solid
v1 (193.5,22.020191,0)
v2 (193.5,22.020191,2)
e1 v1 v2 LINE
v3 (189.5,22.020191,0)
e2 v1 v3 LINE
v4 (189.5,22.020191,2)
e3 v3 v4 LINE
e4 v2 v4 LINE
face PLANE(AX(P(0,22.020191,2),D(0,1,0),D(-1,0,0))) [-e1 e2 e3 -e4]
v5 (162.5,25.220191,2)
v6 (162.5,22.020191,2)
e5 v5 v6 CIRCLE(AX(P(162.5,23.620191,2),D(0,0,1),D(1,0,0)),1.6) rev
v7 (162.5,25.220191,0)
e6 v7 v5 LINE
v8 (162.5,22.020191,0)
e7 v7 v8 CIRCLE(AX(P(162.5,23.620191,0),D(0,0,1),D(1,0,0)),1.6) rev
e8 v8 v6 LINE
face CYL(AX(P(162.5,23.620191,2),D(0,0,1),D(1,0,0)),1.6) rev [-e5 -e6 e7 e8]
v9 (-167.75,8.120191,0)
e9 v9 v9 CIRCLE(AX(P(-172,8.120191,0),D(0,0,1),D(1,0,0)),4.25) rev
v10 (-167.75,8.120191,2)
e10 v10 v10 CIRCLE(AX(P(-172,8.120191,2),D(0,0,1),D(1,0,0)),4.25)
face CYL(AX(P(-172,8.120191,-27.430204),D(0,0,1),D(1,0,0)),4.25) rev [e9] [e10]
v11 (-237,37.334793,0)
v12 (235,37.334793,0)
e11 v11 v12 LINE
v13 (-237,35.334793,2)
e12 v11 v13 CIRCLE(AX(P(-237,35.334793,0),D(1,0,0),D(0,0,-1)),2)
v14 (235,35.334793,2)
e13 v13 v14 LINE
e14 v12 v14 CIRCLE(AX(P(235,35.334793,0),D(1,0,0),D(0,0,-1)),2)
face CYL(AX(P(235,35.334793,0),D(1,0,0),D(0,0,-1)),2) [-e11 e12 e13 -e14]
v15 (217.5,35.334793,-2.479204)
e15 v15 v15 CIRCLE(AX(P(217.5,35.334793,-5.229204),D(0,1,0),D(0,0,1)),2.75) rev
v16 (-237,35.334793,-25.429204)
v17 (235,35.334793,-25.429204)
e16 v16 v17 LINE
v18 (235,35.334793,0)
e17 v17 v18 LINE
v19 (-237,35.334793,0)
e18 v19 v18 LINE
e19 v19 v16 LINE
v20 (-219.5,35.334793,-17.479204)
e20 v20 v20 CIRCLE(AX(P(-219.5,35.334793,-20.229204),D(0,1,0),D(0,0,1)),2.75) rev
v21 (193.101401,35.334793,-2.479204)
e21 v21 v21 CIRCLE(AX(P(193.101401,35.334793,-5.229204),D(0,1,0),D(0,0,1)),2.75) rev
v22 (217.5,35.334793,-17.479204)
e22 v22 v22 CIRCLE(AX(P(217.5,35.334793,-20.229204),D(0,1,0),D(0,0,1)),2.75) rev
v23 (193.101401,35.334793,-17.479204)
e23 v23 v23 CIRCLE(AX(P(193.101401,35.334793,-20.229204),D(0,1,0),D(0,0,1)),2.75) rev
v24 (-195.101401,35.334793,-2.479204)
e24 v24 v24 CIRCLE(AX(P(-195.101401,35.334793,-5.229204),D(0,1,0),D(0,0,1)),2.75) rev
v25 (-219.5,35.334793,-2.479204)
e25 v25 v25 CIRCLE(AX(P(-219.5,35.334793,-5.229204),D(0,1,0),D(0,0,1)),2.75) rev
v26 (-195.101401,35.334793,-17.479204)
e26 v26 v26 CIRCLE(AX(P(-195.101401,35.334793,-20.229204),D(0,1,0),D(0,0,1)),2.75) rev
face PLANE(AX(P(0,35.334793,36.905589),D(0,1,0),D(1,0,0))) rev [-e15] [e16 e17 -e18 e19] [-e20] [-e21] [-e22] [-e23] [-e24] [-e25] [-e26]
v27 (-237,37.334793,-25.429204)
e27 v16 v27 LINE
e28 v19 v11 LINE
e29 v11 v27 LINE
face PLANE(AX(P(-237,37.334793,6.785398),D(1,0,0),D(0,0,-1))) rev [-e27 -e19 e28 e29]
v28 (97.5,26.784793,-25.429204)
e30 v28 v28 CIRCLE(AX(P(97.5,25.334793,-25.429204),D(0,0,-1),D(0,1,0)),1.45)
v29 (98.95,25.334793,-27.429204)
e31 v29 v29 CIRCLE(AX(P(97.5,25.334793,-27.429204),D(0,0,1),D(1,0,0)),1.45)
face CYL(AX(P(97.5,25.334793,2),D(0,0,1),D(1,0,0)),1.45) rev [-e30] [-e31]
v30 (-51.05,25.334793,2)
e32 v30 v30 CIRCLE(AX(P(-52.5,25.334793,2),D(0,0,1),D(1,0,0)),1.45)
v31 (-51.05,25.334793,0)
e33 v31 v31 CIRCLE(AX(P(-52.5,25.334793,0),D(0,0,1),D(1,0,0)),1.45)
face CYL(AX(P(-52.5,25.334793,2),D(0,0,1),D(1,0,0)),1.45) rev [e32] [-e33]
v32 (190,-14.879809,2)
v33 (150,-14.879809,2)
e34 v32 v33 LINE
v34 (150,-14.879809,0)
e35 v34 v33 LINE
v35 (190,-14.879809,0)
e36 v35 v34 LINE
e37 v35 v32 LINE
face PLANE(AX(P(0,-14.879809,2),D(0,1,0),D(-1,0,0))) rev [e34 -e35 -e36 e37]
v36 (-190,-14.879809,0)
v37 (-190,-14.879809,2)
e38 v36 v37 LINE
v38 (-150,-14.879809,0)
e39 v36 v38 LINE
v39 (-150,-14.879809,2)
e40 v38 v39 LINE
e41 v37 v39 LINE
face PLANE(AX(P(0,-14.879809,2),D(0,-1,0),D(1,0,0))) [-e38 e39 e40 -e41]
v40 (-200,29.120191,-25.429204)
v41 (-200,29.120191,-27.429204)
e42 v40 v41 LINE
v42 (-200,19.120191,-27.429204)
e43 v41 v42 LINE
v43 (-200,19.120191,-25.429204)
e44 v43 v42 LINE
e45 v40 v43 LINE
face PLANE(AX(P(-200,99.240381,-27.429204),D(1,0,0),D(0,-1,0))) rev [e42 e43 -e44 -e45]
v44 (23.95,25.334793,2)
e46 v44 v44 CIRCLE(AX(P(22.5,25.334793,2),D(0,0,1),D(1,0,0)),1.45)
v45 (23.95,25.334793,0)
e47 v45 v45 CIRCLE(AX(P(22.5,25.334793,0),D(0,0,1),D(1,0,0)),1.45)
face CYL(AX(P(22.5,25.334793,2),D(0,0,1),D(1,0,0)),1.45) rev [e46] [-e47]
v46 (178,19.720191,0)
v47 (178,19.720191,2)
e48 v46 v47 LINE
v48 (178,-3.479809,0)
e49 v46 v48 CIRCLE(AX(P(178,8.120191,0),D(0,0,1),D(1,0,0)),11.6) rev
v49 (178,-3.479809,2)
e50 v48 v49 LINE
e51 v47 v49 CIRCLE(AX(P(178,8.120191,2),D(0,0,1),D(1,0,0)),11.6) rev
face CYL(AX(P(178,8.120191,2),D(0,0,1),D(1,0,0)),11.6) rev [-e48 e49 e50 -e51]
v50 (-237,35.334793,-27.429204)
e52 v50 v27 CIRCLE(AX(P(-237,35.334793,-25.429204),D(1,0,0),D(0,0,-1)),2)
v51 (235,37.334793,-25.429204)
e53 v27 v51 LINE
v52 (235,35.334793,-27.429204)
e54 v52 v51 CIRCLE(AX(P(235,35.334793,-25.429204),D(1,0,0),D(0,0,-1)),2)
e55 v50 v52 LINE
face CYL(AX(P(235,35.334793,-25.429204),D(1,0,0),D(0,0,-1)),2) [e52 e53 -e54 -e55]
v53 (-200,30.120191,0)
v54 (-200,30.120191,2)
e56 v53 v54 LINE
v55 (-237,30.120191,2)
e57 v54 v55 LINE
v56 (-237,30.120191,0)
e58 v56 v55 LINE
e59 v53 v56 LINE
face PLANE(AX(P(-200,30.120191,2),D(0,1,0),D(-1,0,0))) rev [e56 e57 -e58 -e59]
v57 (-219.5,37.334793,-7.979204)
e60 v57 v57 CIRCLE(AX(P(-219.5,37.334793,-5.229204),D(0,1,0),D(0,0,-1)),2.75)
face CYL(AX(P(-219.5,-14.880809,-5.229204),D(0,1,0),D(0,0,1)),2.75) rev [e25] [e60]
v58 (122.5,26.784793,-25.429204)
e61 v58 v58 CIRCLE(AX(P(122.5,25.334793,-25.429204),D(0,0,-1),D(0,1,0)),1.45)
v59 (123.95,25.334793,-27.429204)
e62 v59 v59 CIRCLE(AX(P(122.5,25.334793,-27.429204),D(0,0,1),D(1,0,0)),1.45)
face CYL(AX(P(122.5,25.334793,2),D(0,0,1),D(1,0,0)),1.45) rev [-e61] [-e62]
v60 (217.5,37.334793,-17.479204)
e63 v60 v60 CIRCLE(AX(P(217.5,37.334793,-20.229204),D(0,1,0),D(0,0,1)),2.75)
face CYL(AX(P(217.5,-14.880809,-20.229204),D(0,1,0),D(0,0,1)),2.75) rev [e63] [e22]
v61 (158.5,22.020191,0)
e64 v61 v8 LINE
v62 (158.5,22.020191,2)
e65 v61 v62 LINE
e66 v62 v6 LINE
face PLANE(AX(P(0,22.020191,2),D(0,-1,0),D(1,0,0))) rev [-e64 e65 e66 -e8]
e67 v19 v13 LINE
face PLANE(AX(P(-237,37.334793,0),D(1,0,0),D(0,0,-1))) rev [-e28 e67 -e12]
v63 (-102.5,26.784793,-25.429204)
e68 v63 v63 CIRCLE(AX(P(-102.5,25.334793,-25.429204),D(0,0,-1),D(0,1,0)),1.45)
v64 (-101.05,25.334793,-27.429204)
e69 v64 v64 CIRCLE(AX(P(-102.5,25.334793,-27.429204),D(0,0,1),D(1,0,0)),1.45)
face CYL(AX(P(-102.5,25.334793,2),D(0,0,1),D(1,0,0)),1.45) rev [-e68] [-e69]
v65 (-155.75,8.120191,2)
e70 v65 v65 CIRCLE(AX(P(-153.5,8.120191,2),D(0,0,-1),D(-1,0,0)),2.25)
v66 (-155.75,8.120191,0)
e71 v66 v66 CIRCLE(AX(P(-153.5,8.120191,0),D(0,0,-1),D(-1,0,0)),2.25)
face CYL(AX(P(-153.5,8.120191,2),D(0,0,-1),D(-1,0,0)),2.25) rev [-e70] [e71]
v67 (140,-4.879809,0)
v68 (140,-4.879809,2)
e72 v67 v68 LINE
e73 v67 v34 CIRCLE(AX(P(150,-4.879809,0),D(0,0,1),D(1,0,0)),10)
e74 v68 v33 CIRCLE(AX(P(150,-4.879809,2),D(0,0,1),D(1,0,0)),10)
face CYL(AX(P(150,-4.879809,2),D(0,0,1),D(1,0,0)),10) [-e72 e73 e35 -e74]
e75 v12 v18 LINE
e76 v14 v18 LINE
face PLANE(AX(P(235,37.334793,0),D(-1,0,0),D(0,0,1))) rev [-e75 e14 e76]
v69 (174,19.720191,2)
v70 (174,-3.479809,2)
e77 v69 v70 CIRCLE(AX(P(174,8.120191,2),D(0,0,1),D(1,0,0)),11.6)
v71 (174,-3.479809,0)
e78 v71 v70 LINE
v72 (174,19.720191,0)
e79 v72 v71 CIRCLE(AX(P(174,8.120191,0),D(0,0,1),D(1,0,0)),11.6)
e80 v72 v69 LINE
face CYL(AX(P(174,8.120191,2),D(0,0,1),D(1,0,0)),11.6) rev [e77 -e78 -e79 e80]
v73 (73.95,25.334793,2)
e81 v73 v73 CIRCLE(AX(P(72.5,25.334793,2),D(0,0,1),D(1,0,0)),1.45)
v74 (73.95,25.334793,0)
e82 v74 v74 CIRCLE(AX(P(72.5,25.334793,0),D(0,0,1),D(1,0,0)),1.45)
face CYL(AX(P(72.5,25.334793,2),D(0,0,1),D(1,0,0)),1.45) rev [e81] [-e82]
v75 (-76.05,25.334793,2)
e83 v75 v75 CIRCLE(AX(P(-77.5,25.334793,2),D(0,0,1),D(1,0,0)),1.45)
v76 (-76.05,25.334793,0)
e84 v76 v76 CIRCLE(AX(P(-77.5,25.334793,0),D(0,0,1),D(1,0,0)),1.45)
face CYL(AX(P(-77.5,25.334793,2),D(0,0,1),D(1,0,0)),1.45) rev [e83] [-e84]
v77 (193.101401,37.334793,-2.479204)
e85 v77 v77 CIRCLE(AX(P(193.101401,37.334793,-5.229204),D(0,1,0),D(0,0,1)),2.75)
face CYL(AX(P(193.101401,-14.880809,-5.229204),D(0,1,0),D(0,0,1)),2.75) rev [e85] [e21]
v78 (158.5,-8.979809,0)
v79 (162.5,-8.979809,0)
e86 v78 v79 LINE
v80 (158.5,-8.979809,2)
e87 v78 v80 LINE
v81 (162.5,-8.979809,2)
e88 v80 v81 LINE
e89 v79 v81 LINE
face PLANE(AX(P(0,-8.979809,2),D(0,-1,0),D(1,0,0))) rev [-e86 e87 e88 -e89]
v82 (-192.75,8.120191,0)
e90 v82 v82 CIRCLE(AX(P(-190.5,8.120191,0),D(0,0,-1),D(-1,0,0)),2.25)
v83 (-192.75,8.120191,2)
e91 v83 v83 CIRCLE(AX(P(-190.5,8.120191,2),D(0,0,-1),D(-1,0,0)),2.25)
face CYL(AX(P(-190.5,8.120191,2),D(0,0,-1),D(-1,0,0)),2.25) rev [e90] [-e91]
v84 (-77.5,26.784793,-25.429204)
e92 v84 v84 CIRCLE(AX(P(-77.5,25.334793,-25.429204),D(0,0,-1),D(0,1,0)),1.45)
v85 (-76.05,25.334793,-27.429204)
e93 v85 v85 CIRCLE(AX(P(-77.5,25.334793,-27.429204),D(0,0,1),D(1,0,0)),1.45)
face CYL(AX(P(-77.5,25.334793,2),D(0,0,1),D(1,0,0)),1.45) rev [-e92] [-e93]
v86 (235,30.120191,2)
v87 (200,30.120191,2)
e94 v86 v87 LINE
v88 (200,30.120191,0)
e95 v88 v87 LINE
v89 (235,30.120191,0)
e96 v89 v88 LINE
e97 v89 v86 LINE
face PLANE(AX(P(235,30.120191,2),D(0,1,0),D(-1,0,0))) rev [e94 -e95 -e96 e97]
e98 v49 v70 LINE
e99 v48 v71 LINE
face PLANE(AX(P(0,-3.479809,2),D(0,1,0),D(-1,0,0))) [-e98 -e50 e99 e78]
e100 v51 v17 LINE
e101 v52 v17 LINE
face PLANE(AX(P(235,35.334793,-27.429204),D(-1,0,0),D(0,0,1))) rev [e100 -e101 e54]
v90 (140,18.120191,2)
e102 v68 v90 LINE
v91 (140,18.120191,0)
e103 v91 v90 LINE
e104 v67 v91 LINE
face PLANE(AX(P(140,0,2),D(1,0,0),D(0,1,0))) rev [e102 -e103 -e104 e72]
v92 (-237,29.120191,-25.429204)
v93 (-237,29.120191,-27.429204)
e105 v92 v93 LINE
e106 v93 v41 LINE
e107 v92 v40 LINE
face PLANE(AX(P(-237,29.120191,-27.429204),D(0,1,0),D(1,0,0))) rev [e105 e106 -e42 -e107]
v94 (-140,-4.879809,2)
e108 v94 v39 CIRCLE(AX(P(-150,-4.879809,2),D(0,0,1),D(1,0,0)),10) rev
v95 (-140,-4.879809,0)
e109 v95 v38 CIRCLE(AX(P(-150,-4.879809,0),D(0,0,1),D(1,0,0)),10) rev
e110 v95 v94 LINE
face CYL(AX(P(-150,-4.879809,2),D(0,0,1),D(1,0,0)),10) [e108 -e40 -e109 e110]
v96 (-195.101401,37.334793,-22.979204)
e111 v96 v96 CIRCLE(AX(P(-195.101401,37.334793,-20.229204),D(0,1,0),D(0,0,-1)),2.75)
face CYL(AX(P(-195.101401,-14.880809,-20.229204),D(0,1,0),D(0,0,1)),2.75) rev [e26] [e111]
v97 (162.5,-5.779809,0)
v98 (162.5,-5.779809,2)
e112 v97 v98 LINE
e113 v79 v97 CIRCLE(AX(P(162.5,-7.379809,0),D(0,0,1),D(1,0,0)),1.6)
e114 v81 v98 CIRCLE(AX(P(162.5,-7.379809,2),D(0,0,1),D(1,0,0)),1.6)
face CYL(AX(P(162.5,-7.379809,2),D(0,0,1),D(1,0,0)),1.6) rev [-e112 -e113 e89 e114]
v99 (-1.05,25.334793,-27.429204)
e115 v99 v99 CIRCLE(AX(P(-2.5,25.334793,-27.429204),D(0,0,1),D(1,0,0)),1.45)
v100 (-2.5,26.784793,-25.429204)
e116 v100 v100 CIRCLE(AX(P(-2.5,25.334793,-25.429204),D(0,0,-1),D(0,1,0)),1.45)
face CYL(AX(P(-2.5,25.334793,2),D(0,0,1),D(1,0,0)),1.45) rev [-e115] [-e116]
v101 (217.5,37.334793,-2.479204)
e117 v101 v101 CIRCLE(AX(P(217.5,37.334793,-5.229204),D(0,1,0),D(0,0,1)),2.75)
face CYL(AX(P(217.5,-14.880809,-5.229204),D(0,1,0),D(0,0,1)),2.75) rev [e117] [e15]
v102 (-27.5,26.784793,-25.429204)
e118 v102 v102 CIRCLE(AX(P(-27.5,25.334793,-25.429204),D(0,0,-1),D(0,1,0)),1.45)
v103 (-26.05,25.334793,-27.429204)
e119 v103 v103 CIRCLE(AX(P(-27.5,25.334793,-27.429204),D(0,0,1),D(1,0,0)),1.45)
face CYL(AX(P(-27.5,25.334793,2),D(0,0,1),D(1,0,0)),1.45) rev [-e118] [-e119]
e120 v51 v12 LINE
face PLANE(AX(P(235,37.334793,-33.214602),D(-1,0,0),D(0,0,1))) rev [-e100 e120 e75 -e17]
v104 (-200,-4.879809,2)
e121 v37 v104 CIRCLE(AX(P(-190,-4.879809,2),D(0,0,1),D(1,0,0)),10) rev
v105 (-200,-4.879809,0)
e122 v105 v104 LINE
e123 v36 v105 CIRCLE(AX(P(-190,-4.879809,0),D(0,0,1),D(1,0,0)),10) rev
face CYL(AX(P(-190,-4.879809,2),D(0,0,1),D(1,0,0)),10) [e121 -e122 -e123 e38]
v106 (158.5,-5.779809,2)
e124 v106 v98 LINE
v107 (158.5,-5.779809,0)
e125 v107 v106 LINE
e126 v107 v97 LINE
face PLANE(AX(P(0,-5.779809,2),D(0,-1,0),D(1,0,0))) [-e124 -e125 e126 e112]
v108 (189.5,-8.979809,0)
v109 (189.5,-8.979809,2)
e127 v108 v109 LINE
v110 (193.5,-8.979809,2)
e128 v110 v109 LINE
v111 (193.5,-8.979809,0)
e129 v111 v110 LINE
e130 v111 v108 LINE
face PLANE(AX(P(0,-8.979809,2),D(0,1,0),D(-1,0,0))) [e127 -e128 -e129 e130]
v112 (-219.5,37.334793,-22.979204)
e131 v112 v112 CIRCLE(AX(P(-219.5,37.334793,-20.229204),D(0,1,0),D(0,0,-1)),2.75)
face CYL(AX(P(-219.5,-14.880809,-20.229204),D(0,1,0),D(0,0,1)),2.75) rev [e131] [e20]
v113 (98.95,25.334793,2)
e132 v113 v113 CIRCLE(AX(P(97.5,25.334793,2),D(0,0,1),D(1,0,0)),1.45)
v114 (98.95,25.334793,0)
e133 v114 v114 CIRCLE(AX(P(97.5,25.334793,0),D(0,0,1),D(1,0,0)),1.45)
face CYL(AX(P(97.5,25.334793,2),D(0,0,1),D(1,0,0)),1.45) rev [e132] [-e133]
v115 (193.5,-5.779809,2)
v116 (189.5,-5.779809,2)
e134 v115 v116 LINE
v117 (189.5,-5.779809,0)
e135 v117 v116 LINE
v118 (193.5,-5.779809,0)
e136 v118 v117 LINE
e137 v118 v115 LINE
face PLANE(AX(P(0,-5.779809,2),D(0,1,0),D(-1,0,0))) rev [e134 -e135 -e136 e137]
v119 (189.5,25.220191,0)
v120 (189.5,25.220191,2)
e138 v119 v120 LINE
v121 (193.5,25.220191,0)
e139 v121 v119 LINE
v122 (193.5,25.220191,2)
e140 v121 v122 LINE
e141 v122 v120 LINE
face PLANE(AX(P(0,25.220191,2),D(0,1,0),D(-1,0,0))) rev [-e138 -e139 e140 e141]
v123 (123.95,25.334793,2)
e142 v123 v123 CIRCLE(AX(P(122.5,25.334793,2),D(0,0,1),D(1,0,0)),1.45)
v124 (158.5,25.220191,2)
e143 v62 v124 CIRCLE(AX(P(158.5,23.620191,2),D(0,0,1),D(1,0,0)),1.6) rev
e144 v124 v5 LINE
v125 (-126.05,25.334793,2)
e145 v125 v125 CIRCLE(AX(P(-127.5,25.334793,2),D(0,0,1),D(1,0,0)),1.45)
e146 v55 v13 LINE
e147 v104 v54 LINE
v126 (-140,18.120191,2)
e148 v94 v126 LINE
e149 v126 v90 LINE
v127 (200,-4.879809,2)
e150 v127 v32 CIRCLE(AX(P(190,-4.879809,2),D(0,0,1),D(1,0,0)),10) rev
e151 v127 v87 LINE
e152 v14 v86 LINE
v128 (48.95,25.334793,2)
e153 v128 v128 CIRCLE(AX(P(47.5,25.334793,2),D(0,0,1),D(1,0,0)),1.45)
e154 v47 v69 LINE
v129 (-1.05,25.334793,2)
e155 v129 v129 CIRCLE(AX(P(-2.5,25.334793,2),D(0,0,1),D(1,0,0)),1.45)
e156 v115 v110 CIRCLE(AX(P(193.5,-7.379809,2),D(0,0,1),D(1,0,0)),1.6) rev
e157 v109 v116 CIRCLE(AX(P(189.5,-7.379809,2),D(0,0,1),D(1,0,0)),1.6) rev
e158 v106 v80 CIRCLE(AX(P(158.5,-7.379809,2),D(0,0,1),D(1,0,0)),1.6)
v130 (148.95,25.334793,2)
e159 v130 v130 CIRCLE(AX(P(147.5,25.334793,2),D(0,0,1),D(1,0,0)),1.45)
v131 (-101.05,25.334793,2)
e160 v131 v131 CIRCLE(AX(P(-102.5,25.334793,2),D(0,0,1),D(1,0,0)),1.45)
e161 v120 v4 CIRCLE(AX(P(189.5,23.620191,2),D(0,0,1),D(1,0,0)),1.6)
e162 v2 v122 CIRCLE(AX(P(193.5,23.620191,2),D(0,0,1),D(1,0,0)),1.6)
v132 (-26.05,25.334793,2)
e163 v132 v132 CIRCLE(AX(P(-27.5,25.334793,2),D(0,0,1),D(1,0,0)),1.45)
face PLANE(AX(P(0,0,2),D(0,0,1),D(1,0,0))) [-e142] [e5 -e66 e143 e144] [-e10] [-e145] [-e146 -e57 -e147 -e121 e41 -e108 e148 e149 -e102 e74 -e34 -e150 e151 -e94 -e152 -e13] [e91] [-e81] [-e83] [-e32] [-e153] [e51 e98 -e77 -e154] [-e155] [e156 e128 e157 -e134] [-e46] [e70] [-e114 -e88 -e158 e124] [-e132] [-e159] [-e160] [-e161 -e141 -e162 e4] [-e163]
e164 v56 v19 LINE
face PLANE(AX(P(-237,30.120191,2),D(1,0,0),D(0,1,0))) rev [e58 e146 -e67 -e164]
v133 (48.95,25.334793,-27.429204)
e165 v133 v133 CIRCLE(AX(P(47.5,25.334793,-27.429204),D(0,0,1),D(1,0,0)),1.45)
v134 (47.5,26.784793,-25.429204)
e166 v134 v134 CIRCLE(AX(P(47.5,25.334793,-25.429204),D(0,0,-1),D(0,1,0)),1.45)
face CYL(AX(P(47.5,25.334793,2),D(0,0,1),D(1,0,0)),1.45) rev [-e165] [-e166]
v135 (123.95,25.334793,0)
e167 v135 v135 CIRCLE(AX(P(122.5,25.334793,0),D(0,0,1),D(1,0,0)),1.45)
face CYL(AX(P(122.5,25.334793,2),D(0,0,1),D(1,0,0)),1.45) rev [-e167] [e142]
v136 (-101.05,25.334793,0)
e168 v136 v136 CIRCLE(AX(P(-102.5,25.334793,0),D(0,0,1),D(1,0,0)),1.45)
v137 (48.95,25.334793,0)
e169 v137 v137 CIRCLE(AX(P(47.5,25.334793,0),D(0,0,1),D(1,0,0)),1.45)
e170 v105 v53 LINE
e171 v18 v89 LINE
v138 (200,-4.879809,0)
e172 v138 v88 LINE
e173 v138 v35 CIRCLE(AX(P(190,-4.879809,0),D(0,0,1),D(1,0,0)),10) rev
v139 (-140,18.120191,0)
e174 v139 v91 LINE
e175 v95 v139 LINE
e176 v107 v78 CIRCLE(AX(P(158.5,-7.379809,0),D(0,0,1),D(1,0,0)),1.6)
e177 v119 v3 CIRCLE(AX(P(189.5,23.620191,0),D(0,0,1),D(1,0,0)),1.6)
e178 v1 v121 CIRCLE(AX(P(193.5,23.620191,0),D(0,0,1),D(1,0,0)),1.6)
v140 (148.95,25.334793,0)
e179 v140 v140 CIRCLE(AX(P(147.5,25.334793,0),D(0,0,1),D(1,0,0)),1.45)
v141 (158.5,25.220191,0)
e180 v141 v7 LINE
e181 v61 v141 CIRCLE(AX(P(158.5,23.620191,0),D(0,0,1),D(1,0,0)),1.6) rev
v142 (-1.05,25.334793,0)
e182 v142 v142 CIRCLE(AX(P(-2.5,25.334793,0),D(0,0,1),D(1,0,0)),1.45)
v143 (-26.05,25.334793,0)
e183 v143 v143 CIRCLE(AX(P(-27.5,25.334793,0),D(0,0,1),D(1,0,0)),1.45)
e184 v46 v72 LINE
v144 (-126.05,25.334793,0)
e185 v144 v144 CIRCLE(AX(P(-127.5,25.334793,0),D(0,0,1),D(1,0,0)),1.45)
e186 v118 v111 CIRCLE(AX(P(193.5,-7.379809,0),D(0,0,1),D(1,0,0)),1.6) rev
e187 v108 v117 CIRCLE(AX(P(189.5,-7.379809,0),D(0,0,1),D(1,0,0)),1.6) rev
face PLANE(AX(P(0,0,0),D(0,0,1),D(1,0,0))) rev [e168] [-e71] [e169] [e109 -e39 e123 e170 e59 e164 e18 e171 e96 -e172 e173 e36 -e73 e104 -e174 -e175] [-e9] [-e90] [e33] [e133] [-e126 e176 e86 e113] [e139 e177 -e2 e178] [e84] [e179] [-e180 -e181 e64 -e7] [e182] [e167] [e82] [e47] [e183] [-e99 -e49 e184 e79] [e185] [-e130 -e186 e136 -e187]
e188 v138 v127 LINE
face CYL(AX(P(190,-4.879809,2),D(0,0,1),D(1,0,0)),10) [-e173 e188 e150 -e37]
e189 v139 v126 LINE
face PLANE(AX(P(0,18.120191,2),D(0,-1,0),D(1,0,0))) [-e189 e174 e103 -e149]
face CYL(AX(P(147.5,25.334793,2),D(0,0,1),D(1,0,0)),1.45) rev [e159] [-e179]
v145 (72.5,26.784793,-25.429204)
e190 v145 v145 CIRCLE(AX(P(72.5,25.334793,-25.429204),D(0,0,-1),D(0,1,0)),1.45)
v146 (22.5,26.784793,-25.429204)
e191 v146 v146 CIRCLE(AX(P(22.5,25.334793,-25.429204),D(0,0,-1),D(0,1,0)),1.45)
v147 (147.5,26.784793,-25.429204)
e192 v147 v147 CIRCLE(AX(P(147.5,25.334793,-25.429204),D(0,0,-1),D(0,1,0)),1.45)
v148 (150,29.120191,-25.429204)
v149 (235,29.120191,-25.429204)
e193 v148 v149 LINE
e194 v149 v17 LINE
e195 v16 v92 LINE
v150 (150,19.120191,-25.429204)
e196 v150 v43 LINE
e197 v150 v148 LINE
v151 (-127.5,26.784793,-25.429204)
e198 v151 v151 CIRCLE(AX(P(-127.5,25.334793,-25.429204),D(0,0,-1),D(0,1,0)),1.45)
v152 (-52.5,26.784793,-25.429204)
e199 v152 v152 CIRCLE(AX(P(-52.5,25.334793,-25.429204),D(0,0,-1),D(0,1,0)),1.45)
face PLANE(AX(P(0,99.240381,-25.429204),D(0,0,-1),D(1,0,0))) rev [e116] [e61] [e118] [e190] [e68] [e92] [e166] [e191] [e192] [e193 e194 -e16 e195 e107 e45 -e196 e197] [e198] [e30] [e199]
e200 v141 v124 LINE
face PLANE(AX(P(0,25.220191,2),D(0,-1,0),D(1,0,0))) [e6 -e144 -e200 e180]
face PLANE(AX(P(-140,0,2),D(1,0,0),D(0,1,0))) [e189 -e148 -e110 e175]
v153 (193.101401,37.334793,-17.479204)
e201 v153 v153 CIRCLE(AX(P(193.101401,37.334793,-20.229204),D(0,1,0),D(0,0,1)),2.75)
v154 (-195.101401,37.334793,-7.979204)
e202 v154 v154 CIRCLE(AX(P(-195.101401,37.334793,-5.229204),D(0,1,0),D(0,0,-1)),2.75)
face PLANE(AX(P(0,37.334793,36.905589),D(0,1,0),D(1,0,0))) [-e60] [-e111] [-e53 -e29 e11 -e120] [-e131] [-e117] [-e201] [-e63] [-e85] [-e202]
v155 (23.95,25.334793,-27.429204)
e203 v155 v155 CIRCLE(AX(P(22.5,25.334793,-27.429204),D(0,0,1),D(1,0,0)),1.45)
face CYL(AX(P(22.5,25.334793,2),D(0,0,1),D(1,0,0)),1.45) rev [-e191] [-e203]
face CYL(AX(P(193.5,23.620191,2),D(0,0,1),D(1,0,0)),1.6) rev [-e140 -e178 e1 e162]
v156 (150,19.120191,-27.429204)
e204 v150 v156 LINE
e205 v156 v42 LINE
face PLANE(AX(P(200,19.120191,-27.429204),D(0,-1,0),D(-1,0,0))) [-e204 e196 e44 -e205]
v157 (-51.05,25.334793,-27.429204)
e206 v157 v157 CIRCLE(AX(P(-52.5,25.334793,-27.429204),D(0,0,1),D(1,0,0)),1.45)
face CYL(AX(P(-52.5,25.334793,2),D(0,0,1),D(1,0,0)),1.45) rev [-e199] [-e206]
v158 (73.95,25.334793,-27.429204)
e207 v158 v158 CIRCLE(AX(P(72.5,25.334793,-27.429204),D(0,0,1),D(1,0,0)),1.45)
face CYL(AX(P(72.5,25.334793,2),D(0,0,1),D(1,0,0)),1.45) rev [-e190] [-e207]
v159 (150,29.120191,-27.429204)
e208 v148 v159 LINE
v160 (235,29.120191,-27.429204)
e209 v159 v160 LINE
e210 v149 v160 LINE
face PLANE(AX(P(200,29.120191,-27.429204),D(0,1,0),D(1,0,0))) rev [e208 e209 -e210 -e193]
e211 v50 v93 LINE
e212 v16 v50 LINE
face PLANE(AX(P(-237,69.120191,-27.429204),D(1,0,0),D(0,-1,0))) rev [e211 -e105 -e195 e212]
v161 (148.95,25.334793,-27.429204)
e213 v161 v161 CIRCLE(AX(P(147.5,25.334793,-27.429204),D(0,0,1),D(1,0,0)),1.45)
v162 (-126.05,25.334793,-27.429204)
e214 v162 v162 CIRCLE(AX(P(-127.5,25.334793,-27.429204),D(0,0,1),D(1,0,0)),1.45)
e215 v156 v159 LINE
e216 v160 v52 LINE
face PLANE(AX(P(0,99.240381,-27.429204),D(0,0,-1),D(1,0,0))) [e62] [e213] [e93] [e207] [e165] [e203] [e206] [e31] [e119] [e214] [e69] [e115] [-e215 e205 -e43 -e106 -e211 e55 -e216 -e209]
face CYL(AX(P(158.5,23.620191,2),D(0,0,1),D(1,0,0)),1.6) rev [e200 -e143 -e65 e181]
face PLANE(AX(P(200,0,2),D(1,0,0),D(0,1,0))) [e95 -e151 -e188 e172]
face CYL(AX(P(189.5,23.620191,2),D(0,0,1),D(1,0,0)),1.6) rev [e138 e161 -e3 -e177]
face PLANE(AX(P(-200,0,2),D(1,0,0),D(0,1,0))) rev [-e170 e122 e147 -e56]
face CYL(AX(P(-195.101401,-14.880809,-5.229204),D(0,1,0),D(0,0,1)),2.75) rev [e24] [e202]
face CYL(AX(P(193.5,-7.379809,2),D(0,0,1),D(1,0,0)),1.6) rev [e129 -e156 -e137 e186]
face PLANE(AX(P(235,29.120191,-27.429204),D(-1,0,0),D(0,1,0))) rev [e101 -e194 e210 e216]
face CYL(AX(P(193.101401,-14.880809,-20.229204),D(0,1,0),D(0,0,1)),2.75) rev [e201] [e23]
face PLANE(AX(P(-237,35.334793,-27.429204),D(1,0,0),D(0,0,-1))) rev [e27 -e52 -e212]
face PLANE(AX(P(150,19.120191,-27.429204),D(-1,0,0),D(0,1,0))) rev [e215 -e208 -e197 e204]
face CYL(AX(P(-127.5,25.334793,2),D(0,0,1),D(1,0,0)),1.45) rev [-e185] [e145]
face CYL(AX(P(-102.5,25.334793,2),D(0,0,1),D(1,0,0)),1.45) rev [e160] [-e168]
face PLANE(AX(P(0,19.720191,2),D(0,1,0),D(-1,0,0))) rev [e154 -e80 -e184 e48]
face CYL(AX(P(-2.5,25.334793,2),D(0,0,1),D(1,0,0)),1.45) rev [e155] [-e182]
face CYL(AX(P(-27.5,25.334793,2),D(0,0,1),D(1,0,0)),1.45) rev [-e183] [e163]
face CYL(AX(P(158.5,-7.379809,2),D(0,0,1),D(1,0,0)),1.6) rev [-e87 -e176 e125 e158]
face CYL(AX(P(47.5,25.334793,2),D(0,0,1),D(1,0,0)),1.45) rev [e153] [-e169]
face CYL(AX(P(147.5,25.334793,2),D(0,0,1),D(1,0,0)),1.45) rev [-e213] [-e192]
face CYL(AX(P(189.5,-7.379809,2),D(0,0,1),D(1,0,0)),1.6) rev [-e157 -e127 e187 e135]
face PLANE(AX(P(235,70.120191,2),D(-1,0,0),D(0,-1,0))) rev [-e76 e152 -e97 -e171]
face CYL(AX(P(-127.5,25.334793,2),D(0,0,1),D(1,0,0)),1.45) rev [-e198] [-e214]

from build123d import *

# Parameters (mm, degrees)
BOSS_EXTRUDE1_DEPTH        = 2
SKETCH2_W                  = 400
SKETCH2_H                  = 2
BOSS_EXTRUDE2_DEPTH        = 37
CUT_EXTRUDE7_REACH         = 217.461
SKETCH32_W                 = 50
SKETCH32_H                 = 10
SKETCH35_W                 = 37
SKETCH35_H                 = 40
BOSS_EXTRUDE7_DEPTH        = 2
SKETCHED_START             = -237
SKETCHED_BEND1_DEPTH       = 472
SKETCHED_BEND1_2_DEPTH     = 472
SKETCHED_START_2           = -200
SKETCHED_BEND1_3_OUTLINE_W = 10
SKETCHED_BEND1_3_OUTLINE_H = 2
SKETCHED_BEND1_3_DEPTH     = 350
SKETCH24_W                 = 300
SKETCH24_H                 = 12
CUT_EXTRUDE4_DEPTH         = 1
CUT_EXTRUDE5_REACH         = 243.721
SKETCH25_R                 = 4.25
SKETCH30_W                 = 300
SKETCH30_H                 = 12
BOSS_EXTRUDE6_DEPTH        = 1
M3_5_TAPPED_HOLE1_D        = 2.9
LPATTERN1_COUNT            = 12
LPATTERN1_PITCH            = 25
SKETCH31_R                 = 2.25
CUT_EXTRUDE6_DEPTH         = 242.485502568
CUT_EXTRUDE8_REACH         = 246.229
SKETCH38_R                 = 2.75


# Read off the part's stored shape, not the designer's step: Sketched Bend1
with BuildPart() as part:
    # Sketch1 → Boss-Extrude1 (new body)
    with BuildSketch(Plane.XY):
        with BuildLine():
            Line((-190, -14.879809267), (-150, -14.879809267))
            ThreePointArc((-150, -14.879809267), (-142.928932188, -11.950877079), (-140, -4.879809267))
            Line((-140, -4.879809267), (-140, 18.120190733))
            Line((-140, 18.120190733), (140, 18.120190733))
            Line((140, 18.120190733), (140, -4.879809267))
            ThreePointArc((140, -4.879809267), (142.928932188, -11.950877079), (150, -14.879809267))
            Line((150, -14.879809267), (190, -14.879809267))
            ThreePointArc((190, -14.879809267), (197.071067812, -11.950877079), (200, -4.879809267))
            Line((200, -4.879809267), (200, 43.120190733))
            Line((200, 43.120190733), (-200, 43.120190733))
            Line((-200, 43.120190733), (-200, -4.879809267))
            ThreePointArc((-200, -4.879809267), (-197.071067812, -11.950877079), (-190, -14.879809267))
        make_face()
        with BuildLine():
            Line((178, 19.720190733), (174, 19.720190733))
            ThreePointArc((174, 19.720190733), (162.4, 8.120190733), (174, -3.479809267))
            Line((174, -3.479809267), (178, -3.479809267))
            ThreePointArc((178, -3.479809267), (189.6, 8.120190733), (178, 19.720190733))
        make_face(mode=Mode.SUBTRACT)
        with BuildLine():
            Line((158.5, -5.779809267), (162.5, -5.779809267))
            ThreePointArc((162.5, -5.779809267), (164.1, -7.379809267), (162.5, -8.979809267))
            Line((162.5, -8.979809267), (158.5, -8.979809267))
            ThreePointArc((158.5, -8.979809267), (156.9, -7.379809267), (158.5, -5.779809267))
        make_face(mode=Mode.SUBTRACT)
        with BuildLine():
            Line((193.5, -5.779809267), (189.5, -5.779809267))
            ThreePointArc((189.5, -5.779809267), (187.9, -7.379809267), (189.5, -8.979809267))
            Line((189.5, -8.979809267), (193.5, -8.979809267))
            ThreePointArc((193.5, -8.979809267), (195.1, -7.379809267), (193.5, -5.779809267))
        make_face(mode=Mode.SUBTRACT)
        with BuildLine():
            Line((193.5, 25.220190733), (189.5, 25.220190733))
            ThreePointArc((189.5, 25.220190733), (187.9, 23.620190733), (189.5, 22.020190733))
            Line((189.5, 22.020190733), (193.5, 22.020190733))
            ThreePointArc((193.5, 22.020190733), (195.1, 23.620190733), (193.5, 25.220190733))
        make_face(mode=Mode.SUBTRACT)
        with BuildLine():
            Line((158.5, 25.220190733), (162.5, 25.220190733))
            ThreePointArc((162.5, 25.220190733), (164.1, 23.620190733), (162.5, 22.020190733))
            Line((162.5, 22.020190733), (158.5, 22.020190733))
            ThreePointArc((158.5, 22.020190733), (156.9, 23.620190733), (158.5, 25.220190733))
        make_face(mode=Mode.SUBTRACT)
    extrude(amount=BOSS_EXTRUDE1_DEPTH)

    # Sketch2 → Boss-Extrude2 (add)
    with BuildSketch(Plane(origin=(0, 43.120190733, 40.120190733), x_dir=(-1, 0, 0), z_dir=(0, -1, 0))):
        with Locations((0, 39.120190733)):
            Rectangle(SKETCH2_W, SKETCH2_H)
    extrude(amount=-BOSS_EXTRUDE2_DEPTH)

    # Sketch32 → Cut-Extrude7 (cut, up to next)
    with BuildSketch(Plane.XY.offset(2), mode=Mode.PRIVATE) as cut_extrude7_sk1:
        with Locations((175, 75.120190733)):
            Rectangle(SKETCH32_W, SKETCH32_H)
    cut_extrude7_tool1 = extrude(cut_extrude7_sk1.sketch, amount=-CUT_EXTRUDE7_REACH, mode=Mode.PRIVATE) & part.part
    add(cut_extrude7_tool1.solids().sort_by_distance((175, 75.120191, 2))[0], mode=Mode.SUBTRACT)

    # Sketch35 → Boss-Extrude7 (add)
    with BuildSketch(Plane(origin=(0, 0, 0), x_dir=(-1, 0, 0), z_dir=(0, 0, -1))):
        with Locations((-216.5, 50.120190733)):
            Rectangle(SKETCH35_W, SKETCH35_H)
        with Locations((218.5, 50.120190733)):
            Rectangle(SKETCH35_W, SKETCH35_H)
    extrude(amount=-BOSS_EXTRUDE7_DEPTH)

    # Sketched Bend1 outline → Sketched Bend1 (cut)
    with BuildSketch(Plane.YZ.offset(SKETCHED_START)):
        with BuildLine():
            ThreePointArc((35.33479257, 2), (36.749006132, 1.414213562), (37.33479257, 0))
            Line((37.33479257, 0), (80.120190733, 0))
            Line((80.120190733, 0), (80.120190733, 2))
            Line((80.120190733, 2), (35.33479257, 2))
        make_face()
    extrude(amount=SKETCHED_BEND1_DEPTH, mode=Mode.SUBTRACT)

    # Sketched Bend1 2 outline → Sketched Bend1 2 (add)
    with BuildSketch(Plane.YZ.offset(SKETCHED_START)):
        with BuildLine():
            ThreePointArc((35.33479257, -27.429203673), (36.749006132, -26.843417235), (37.33479257, -25.429203673))
            Line((37.33479257, -25.429203673), (37.33479257, 0))
            Line((37.33479257, 0), (35.33479257, 0))
            Line((35.33479257, 0), (35.33479257, -25.429203673))
            Line((35.33479257, -25.429203673), (29.120190733, -25.429203673))
            Line((29.120190733, -25.429203673), (29.120190733, -27.429203673))
            Line((29.120190733, -27.429203673), (35.33479257, -27.429203673))
        make_face()
    extrude(amount=SKETCHED_BEND1_2_DEPTH)

    # Sketched Bend1 3 outline → Sketched Bend1 3 (add)
    with BuildSketch(Plane.YZ.offset(SKETCHED_START_2)):
        with Locations((24.120190733, -26.429203673)):
            Rectangle(SKETCHED_BEND1_3_OUTLINE_W, SKETCHED_BEND1_3_OUTLINE_H)
    extrude(amount=SKETCHED_BEND1_3_DEPTH)

    # Sketch24 → Cut-Extrude4 (cut)
    with BuildSketch(Plane.XY.offset(2)):
        with Locations((0, 27.33479257)):
            Rectangle(SKETCH24_W, SKETCH24_H)
    extrude(amount=-CUT_EXTRUDE4_DEPTH, mode=Mode.SUBTRACT)

    # Sketch25 → Cut-Extrude5 (cut, up to next)
    with BuildSketch(Plane.XY.offset(2), mode=Mode.PRIVATE) as cut_extrude5_sk1:
        with Locations((-172, 8.120190733)):
            Circle(SKETCH25_R)
    cut_extrude5_tool1 = extrude(cut_extrude5_sk1.sketch, amount=-CUT_EXTRUDE5_REACH, mode=Mode.PRIVATE) & part.part
    add(cut_extrude5_tool1.solids().sort_by_distance((-172, 8.120191, 2))[0], mode=Mode.SUBTRACT)

    # Sketch30 → Boss-Extrude6 (add)
    with BuildSketch(Plane.XY.offset(1)):
        with Locations((0, 27.33479257)):
            Rectangle(SKETCH30_W, SKETCH30_H)
    extrude(amount=BOSS_EXTRUDE6_DEPTH)

    # M3.5 Tapped Hole1 (through all)
    with Locations(Plane(origin=(-127.5, 25.33479257, 2), x_dir=(1, 0, 0), z_dir=(0, 0, 1))):
        with Locations((0, 0)):
            m3_5_tapped_hole1 = Hole(M3_5_TAPPED_HOLE1_D / 2)

    # LPattern1: M3.5 Tapped Hole1 ×12
    with Locations(*[(i * LPATTERN1_PITCH, 0, 0) for i in range(1, LPATTERN1_COUNT)]):
        add(m3_5_tapped_hole1, mode=Mode.SUBTRACT)

    # Sketch31 → Cut-Extrude6 (cut, through all)
    with BuildSketch(Plane(origin=(0, 0, 0), x_dir=(-1, 0, 0), z_dir=(0, 0, -1))):
        with Locations((190.5, 8.120190733)):
            Circle(SKETCH31_R)
        with Locations((153.5, 8.120190733)):
            Circle(SKETCH31_R)
    extrude(amount=-CUT_EXTRUDE6_DEPTH, mode=Mode.SUBTRACT)

    # Sketch38 → Cut-Extrude8 (cut, up to next)
    with BuildSketch(Plane(origin=(0, 37.33479257, 0), x_dir=(1, 0, 0), z_dir=(0, 1, 0)), mode=Mode.PRIVATE) as cut_extrude8_sk1:
        with Locations(Location((193.10140085, 5.229203673, 0), (0, 0, 270))):
            Circle(SKETCH38_R)
    cut_extrude8_tool1 = extrude(cut_extrude8_sk1.sketch, amount=-CUT_EXTRUDE8_REACH, mode=Mode.PRIVATE) & part.part
    # Sketch38 → Cut-Extrude8 (cut, up to next)
    with BuildSketch(Plane(origin=(0, 37.33479257, 0), x_dir=(1, 0, 0), z_dir=(0, 1, 0)), mode=Mode.PRIVATE) as cut_extrude8_sk2:
        with Locations(Location((193.10140085, 20.229203673, 0), (0, 0, 270))):
            Circle(SKETCH38_R)
    cut_extrude8_tool2 = extrude(cut_extrude8_sk2.sketch, amount=-CUT_EXTRUDE8_REACH, mode=Mode.PRIVATE) & part.part
    # Sketch38 → Cut-Extrude8 (cut, up to next)
    with BuildSketch(Plane(origin=(0, 37.33479257, 0), x_dir=(1, 0, 0), z_dir=(0, 1, 0)), mode=Mode.PRIVATE) as cut_extrude8_sk3:
        with Locations(Location((217.5, 20.229203673, 0), (0, 0, 270))):
            Circle(SKETCH38_R)
    cut_extrude8_tool3 = extrude(cut_extrude8_sk3.sketch, amount=-CUT_EXTRUDE8_REACH, mode=Mode.PRIVATE) & part.part
    # Sketch38 → Cut-Extrude8 (cut, up to next)
    with BuildSketch(Plane(origin=(0, 37.33479257, 0), x_dir=(1, 0, 0), z_dir=(0, 1, 0)), mode=Mode.PRIVATE) as cut_extrude8_sk4:
        with Locations(Location((217.5, 5.229203673, 0), (0, 0, 270))):
            Circle(SKETCH38_R)
    cut_extrude8_tool4 = extrude(cut_extrude8_sk4.sketch, amount=-CUT_EXTRUDE8_REACH, mode=Mode.PRIVATE) & part.part
    # Sketch38 → Cut-Extrude8 (cut, up to next)
    with BuildSketch(Plane(origin=(0, 37.33479257, 0), x_dir=(1, 0, 0), z_dir=(0, 1, 0)), mode=Mode.PRIVATE) as cut_extrude8_sk5:
        with Locations(Location((-219.5, 5.229203673, 0), (0, 0, 270))):
            Circle(SKETCH38_R)
    cut_extrude8_tool5 = extrude(cut_extrude8_sk5.sketch, amount=-CUT_EXTRUDE8_REACH, mode=Mode.PRIVATE) & part.part
    # Sketch38 → Cut-Extrude8 (cut, up to next)
    with BuildSketch(Plane(origin=(0, 37.33479257, 0), x_dir=(1, 0, 0), z_dir=(0, 1, 0)), mode=Mode.PRIVATE) as cut_extrude8_sk6:
        with Locations(Location((-219.5, 20.229203673, 0), (0, 0, 270))):
            Circle(SKETCH38_R)
    cut_extrude8_tool6 = extrude(cut_extrude8_sk6.sketch, amount=-CUT_EXTRUDE8_REACH, mode=Mode.PRIVATE) & part.part
    # Sketch38 → Cut-Extrude8 (cut, up to next)
    with BuildSketch(Plane(origin=(0, 37.33479257, 0), x_dir=(1, 0, 0), z_dir=(0, 1, 0)), mode=Mode.PRIVATE) as cut_extrude8_sk7:
        with Locations(Location((-195.10140085, 20.229203673, 0), (0, 0, 270))):
            Circle(SKETCH38_R)
    cut_extrude8_tool7 = extrude(cut_extrude8_sk7.sketch, amount=-CUT_EXTRUDE8_REACH, mode=Mode.PRIVATE) & part.part
    # Sketch38 → Cut-Extrude8 (cut, up to next)
    with BuildSketch(Plane(origin=(0, 37.33479257, 0), x_dir=(1, 0, 0), z_dir=(0, 1, 0)), mode=Mode.PRIVATE) as cut_extrude8_sk8:
        with Locations(Location((-195.10140085, 5.229203673, 0), (0, 0, 270))):
            Circle(SKETCH38_R)
    cut_extrude8_tool8 = extrude(cut_extrude8_sk8.sketch, amount=-CUT_EXTRUDE8_REACH, mode=Mode.PRIVATE) & part.part
    add(cut_extrude8_tool1.solids().sort_by_distance((193.101401, 37.334793, -5.229204))[0], mode=Mode.SUBTRACT)
    add(cut_extrude8_tool2.solids().sort_by_distance((193.101401, 37.334793, -20.229204))[0], mode=Mode.SUBTRACT)
    add(cut_extrude8_tool3.solids().sort_by_distance((217.5, 37.334793, -20.229204))[0], mode=Mode.SUBTRACT)
    add(cut_extrude8_tool4.solids().sort_by_distance((217.5, 37.334793, -5.229204))[0], mode=Mode.SUBTRACT)
    add(cut_extrude8_tool5.solids().sort_by_distance((-219.5, 37.334793, -5.229204))[0], mode=Mode.SUBTRACT)
    add(cut_extrude8_tool6.solids().sort_by_distance((-219.5, 37.334793, -20.229204))[0], mode=Mode.SUBTRACT)
    add(cut_extrude8_tool7.solids().sort_by_distance((-195.101401, 37.334793, -20.229204))[0], mode=Mode.SUBTRACT)
    add(cut_extrude8_tool8.solids().sort_by_distance((-195.101401, 37.334793, -5.229204))[0], mode=Mode.SUBTRACT)


solid = part.part
